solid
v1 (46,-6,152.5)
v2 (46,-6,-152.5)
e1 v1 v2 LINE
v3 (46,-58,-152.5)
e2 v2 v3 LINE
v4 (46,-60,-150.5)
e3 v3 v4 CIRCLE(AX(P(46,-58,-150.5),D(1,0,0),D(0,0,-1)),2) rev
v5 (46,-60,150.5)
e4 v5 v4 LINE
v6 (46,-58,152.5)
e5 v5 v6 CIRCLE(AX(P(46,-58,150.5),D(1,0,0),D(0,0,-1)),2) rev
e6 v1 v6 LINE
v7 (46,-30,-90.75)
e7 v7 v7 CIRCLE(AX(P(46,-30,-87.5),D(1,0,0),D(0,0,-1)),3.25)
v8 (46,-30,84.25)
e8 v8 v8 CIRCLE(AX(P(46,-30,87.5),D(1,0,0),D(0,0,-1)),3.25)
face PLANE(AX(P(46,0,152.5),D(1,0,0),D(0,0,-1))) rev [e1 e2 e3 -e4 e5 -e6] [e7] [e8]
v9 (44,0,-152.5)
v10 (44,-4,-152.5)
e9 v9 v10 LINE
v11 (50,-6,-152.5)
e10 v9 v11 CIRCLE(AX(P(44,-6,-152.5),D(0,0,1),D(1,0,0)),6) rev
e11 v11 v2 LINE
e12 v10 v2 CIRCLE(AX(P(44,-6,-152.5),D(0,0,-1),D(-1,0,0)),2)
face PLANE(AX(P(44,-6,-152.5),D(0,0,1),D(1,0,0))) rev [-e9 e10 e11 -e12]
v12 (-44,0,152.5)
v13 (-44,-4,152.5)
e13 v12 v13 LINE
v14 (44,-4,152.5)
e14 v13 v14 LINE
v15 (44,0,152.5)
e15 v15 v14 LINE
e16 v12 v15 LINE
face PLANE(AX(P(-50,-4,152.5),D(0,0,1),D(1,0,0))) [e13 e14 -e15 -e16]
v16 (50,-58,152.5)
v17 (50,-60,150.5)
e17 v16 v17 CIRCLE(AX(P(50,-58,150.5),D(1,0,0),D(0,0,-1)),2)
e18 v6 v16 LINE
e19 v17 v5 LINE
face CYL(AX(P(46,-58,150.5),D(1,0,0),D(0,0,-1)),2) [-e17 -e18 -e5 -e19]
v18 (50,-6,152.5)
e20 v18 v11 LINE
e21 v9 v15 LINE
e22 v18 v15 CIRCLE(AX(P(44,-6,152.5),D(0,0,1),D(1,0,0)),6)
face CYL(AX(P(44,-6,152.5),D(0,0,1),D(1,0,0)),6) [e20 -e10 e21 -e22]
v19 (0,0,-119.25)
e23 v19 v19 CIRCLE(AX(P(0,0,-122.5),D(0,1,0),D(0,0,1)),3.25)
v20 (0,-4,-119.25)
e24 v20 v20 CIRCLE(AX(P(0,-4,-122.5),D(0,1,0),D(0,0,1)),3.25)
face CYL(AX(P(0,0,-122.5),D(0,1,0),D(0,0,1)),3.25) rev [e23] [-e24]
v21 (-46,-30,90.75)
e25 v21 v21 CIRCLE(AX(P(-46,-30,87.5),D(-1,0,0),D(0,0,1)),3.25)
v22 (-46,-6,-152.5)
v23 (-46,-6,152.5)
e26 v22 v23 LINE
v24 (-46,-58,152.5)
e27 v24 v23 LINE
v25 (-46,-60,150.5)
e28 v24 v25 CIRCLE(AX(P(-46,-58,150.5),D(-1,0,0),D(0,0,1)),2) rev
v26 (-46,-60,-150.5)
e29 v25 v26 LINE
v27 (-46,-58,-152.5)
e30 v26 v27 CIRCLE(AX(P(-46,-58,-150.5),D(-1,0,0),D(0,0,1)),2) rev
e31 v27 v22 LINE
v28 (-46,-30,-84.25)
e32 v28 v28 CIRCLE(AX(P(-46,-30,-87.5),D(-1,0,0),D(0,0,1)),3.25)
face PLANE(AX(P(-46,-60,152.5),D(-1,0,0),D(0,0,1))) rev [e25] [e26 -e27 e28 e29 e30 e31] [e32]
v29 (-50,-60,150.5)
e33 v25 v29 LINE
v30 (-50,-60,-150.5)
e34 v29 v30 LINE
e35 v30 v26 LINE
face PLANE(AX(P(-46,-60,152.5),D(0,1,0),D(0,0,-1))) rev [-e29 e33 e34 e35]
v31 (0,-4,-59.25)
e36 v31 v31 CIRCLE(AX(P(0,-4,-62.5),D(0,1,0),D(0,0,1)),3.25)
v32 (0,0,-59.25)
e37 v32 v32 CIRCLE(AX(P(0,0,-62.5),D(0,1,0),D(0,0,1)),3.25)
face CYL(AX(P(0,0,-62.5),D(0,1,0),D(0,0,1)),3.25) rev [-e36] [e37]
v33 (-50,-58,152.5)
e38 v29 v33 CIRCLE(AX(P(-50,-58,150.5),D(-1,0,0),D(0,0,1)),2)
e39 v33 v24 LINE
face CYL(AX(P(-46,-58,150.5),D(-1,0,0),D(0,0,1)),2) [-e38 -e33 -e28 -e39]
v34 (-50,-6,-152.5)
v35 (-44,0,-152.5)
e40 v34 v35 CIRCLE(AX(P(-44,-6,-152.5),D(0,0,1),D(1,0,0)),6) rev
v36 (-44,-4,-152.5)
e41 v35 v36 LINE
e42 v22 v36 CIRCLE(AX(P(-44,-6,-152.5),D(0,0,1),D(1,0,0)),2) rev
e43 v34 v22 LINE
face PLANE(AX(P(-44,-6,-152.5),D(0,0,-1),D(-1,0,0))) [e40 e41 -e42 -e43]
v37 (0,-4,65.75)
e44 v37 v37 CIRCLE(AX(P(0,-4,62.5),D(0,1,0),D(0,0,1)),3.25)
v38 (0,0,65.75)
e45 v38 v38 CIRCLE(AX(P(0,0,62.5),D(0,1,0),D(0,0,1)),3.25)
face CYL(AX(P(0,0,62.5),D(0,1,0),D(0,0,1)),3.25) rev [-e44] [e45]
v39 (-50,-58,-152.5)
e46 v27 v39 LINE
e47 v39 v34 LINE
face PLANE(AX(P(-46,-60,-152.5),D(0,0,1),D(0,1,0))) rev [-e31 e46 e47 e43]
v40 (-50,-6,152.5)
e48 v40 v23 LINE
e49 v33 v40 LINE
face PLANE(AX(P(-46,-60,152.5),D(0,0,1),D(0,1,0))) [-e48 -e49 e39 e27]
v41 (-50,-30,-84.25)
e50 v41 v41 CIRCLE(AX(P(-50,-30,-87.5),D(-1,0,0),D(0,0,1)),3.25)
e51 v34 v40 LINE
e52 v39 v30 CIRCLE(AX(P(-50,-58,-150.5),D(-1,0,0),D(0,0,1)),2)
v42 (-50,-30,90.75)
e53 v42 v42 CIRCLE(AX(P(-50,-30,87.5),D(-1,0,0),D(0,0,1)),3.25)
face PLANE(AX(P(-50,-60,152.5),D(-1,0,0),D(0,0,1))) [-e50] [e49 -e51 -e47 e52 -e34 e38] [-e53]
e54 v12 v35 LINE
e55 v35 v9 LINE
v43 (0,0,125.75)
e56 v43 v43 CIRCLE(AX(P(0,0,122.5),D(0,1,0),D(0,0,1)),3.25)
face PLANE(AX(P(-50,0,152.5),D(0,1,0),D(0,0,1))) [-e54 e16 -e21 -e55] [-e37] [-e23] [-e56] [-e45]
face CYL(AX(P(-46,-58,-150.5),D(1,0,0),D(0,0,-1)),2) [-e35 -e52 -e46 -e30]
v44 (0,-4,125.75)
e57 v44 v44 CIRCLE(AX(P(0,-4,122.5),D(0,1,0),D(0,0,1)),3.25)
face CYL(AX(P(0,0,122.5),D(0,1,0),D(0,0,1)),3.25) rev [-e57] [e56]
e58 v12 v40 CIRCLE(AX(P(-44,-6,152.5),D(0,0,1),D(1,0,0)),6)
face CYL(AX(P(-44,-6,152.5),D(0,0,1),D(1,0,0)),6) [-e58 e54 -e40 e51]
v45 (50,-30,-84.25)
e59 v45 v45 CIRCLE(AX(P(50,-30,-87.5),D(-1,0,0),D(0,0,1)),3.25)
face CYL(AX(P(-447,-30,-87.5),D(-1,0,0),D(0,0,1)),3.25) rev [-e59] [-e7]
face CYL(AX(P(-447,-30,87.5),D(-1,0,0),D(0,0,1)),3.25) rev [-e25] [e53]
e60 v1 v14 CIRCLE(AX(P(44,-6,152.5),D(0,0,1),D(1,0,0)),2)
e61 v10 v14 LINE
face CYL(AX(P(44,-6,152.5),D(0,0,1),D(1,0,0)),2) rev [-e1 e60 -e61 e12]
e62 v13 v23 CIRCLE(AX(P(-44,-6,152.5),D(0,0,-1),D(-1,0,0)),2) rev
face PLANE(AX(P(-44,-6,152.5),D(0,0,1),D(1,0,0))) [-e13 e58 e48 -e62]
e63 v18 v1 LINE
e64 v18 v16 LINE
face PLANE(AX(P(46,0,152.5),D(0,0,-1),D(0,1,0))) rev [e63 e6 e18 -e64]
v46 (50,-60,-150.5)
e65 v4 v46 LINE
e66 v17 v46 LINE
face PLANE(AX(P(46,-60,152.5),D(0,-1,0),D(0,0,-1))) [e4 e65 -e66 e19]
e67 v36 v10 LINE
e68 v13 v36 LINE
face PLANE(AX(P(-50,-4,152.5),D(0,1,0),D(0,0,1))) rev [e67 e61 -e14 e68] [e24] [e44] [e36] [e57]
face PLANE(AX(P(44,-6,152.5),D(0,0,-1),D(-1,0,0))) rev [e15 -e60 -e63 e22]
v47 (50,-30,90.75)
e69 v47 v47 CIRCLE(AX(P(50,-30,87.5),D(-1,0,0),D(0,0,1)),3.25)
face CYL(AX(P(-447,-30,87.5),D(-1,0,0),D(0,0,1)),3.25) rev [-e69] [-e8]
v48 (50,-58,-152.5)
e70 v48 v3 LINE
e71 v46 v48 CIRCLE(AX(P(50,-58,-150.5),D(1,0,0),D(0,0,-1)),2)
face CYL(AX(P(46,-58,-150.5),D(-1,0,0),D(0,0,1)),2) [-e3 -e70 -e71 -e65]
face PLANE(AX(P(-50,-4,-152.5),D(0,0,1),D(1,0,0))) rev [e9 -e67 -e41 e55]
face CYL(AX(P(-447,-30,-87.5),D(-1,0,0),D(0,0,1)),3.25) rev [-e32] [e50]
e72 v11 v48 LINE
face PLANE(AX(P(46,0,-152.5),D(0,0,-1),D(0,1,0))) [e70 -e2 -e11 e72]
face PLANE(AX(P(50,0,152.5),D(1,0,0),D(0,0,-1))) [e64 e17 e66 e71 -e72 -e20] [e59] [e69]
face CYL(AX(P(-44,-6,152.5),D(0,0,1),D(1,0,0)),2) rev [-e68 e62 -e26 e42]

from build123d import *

# Parameters (mm, degrees)
EXTRUDE_THIN1_DEPTH            = 152.5
CONVERT_SOLID1_START           = -152.5
CONVERT_SOLID1_DEPTH           = 305
CONVERT_SOLID1_2_DEPTH         = 305
FILLET1_R                      = 2
F_6_5_6_5_DIAMETER_HOLE1_D     = 6.5
F_6_5_6_5_DIAMETER_HOLE2_D     = 6.5
F_6_5_6_5_DIAMETER_HOLE2_DEPTH = 497


# Read off the part's stored shape, not the designer's step: Convert-Solid1
with BuildPart() as part:
    # Sketch1 → Extrude-Thin1 (new, symmetric)
    with BuildSketch(Plane.XY):
        Polygon((-50, -60), (-50, 0), (50, 0), (50, -60), (46, -60), (46, -4), (-46, -4), (-46, -60), align=None)
    extrude(amount=EXTRUDE_THIN1_DEPTH, both=True)

    # Convert-Solid1 outline → Convert-Solid1 (cut)
    with BuildSketch(Plane.XY.offset(CONVERT_SOLID1_START)):
        with BuildLine():
            Line((50, 0), (44, 0))
            ThreePointArc((44, 0), (48.242640687, -1.757359313), (50, -6))
            Line((50, -6), (50, 0))
        make_face()
        with BuildLine():
            ThreePointArc((-50, -6), (-48.242640687, -1.757359313), (-44, 0))
            Line((-44, 0), (-50, 0))
            Line((-50, 0), (-50, -6))
        make_face()
    extrude(amount=CONVERT_SOLID1_DEPTH, mode=Mode.SUBTRACT)

    # Convert-Solid1 2 outline → Convert-Solid1 2 (add)
    with BuildSketch(Plane.XY.offset(CONVERT_SOLID1_START)):
        with BuildLine():
            Line((46, -4), (44, -4))
            ThreePointArc((44, -4), (45.414213562, -4.585786438), (46, -6))
            Line((46, -6), (46, -4))
        make_face()
        with BuildLine():
            ThreePointArc((-46, -6), (-45.414213562, -4.585786438), (-44, -4))
            Line((-44, -4), (-46, -4))
            Line((-46, -4), (-46, -6))
        make_face()
    extrude(amount=CONVERT_SOLID1_2_DEPTH)

    # Fillet1
    fillet1_edges = [part.edges().sort_by_distance(p)[0] for p in [
        (48, -60, 152.5),
        (48, -60, -152.5),
        (-48, -60, -152.5),
        (-48, -60, 152.5),
    ]]
    fillet(fillet1_edges, radius=FILLET1_R)

    # Ø6.5 (6.5) Diameter Hole1 (through all)
    with Locations(Plane(origin=(-244.5, 0, 0), x_dir=(0, 0, 1), z_dir=(0, 1, 0))):
        with Locations((-122.5, 244.5), (-62.5, 244.5), (62.5, 244.5), (122.5, 244.5)):
            Hole(F_6_5_6_5_DIAMETER_HOLE1_D / 2)

    # Ø6.5 (6.5) Diameter Hole2
    with Locations(Plane(origin=(-447, -38, 0), x_dir=(0, 0, 1), z_dir=(-1, 0, 0))):
        with Locations((-87.5, 8), (87.5, 8)):
            Hole(F_6_5_6_5_DIAMETER_HOLE2_D / 2, depth=F_6_5_6_5_DIAMETER_HOLE2_DEPTH)


solid = part.part
